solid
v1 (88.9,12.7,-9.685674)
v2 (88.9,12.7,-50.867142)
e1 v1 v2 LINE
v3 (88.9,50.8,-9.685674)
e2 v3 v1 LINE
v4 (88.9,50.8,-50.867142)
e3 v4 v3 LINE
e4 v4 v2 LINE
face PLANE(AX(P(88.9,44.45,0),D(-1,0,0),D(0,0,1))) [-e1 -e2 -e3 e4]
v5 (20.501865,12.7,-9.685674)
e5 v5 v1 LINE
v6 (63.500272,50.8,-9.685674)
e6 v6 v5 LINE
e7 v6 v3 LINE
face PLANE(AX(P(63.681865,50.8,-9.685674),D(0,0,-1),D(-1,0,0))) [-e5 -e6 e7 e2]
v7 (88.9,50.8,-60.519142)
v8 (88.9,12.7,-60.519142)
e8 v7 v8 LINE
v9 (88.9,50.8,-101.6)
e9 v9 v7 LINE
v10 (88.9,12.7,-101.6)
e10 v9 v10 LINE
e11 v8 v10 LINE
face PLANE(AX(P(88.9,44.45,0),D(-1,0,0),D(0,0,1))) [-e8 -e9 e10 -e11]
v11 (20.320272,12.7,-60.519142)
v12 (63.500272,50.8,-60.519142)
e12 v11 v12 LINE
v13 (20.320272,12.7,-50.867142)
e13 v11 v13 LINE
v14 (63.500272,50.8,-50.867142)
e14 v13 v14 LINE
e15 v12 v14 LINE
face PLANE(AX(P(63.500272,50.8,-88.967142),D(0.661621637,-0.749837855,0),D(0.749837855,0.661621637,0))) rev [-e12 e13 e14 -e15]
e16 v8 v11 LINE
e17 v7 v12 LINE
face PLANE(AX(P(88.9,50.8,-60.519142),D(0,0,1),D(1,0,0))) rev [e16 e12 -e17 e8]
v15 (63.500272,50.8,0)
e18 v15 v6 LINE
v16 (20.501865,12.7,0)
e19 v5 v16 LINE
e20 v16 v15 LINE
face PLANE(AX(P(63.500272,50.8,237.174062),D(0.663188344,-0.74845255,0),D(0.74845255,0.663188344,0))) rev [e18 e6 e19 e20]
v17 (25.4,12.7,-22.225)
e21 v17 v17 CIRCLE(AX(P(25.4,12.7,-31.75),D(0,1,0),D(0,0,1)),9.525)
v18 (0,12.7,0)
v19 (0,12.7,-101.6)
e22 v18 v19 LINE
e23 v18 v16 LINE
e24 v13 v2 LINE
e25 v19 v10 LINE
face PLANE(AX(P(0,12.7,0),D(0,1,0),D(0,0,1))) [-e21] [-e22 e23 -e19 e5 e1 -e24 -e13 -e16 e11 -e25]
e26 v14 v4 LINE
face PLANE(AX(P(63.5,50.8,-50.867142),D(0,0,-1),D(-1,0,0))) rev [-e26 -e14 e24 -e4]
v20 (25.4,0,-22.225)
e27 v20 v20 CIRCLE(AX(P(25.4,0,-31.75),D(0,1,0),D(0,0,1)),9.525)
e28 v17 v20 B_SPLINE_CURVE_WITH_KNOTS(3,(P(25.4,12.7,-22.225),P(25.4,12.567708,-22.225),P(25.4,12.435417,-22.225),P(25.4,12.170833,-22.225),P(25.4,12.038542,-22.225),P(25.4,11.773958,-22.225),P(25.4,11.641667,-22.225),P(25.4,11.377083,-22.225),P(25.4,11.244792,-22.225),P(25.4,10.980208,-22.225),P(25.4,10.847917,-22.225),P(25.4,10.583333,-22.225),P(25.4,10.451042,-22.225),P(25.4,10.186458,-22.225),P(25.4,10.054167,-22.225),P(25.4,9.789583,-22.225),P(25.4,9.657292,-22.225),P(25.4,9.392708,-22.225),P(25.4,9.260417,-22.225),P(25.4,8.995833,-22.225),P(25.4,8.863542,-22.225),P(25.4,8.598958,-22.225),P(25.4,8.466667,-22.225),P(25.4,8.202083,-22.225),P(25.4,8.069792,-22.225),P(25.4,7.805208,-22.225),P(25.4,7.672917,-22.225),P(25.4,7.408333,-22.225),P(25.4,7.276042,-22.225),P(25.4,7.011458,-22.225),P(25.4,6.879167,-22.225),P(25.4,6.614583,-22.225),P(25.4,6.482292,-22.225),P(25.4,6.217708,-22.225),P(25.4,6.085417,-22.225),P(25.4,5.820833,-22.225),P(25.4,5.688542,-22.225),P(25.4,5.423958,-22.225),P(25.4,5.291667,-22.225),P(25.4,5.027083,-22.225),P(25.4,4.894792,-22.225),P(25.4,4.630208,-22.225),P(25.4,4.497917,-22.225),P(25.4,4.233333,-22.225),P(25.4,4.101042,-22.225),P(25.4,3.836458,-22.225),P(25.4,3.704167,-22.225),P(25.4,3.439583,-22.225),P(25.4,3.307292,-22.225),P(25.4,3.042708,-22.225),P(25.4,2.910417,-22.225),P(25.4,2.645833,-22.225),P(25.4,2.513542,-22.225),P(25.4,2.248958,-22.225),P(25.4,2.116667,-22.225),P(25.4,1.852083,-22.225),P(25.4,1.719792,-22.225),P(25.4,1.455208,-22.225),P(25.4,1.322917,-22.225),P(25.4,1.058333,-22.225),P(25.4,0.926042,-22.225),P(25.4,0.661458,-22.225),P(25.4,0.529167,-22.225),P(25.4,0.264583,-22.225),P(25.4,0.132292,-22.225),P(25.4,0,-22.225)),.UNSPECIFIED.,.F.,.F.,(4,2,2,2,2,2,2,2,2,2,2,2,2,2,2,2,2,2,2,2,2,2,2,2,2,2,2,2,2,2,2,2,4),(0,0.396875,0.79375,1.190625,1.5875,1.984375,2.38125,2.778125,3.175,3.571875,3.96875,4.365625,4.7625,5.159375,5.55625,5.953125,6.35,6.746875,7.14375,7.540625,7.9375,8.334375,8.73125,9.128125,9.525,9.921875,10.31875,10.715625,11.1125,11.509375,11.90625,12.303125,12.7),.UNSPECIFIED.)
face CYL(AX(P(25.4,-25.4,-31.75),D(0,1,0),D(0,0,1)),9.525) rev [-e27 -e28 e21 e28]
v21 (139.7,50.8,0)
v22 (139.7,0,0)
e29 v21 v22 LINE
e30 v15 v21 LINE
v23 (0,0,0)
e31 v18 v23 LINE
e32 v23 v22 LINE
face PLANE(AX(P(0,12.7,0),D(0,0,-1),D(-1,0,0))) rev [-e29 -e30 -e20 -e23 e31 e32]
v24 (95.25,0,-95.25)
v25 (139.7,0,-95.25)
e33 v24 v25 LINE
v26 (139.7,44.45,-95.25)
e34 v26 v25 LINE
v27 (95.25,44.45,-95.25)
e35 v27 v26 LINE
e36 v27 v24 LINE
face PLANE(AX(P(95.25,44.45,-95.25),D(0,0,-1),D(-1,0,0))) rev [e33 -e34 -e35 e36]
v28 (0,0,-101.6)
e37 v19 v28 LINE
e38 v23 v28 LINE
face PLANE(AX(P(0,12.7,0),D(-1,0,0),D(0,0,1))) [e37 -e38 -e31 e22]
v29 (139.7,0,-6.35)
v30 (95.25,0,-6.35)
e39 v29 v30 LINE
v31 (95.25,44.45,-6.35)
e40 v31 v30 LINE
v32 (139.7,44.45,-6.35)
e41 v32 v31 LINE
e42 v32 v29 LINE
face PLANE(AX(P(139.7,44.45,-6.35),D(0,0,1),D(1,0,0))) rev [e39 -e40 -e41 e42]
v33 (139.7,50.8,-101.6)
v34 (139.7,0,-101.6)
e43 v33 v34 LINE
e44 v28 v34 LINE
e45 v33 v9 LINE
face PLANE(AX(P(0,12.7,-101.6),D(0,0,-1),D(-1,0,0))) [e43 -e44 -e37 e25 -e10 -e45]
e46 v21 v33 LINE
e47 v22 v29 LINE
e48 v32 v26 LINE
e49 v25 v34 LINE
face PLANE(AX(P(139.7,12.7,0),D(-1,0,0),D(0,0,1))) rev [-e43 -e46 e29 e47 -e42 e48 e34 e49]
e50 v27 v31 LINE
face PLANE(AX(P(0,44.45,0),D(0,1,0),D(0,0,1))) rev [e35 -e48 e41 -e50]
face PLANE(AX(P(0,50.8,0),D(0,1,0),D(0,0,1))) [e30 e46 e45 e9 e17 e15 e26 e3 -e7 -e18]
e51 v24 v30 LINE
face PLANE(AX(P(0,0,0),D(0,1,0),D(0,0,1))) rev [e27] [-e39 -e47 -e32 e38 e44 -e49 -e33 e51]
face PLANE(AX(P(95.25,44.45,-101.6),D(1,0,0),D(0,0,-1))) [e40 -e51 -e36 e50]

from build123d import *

# Parameters (mm, degrees)
SKETCH1_W            = 139.7
SKETCH1_H            = 101.6
BOSS_EXTRUDE1_DEPTH  = 12.7
SKETCH2_W            = 44.45
SKETCH2_H            = 6.35
BOSS_EXTRUDE2_DEPTH  = 31.75
SKETCH3_W            = 44.45
SKETCH3_H            = 6.35
BOSS_EXTRUDE3_DEPTH  = 31.75
SKETCH4_W            = 6.35
SKETCH4_H            = 101.6
BOSS_EXTRUDE4_DEPTH  = 31.75
SKETCH5_W            = 50.8
SKETCH5_H            = 101.6
BOSS_EXTRUDE5_DEPTH  = 6.35
SKETCH7_W            = 44.45
SKETCH7_H            = 88.9
BOSS_EXTRUDE7_DEPTH  = 12.7
SKETCH9_W            = 44.45
SKETCH9_H            = 88.9
CUT_EXTRUDE1_DEPTH   = 12.7
SKETCH10_W           = 25.218134922
SKETCH10_H           = 9.68567434
BOSS_EXTRUDE8_DEPTH  = 38.1
SKETCH11_W           = 25.4
SKETCH11_H           = 9.652
BOSS_EXTRUDE9_DEPTH  = 38.1
SKETCH12_R           = 9.525
CUT_EXTRUDE2_DEPTH   = 38.1
SKETCH13_W           = 43.179728204
SKETCH13_H           = 9.652
BOSS_EXTRUDE10_DEPTH = 38.1
SKETCH14_W           = 43.18
SKETCH14_H           = 9.68567434
BOSS_EXTRUDE11_DEPTH = 38.1
CUT_EXTRUDE8_START   = -9.68567434
CUT_EXTRUDE8_DEPTH   = 9.68567434
CUT_EXTRUDE10_DEPTH  = 38.1


# Read off the part's stored shape, not the designer's step: Cut-Extrude8
with BuildPart() as part:
    # Sketch1 → Boss-Extrude1 (new body)
    with BuildSketch(Plane(origin=(0, 0, 0), x_dir=(1, 0, 0), z_dir=(0, 1, 0))):
        with Locations((69.85, 50.8)):
            Rectangle(SKETCH1_W, SKETCH1_H)
    extrude(amount=BOSS_EXTRUDE1_DEPTH)

    # Sketch2 → Boss-Extrude2 (add)
    with BuildSketch(Plane(origin=(0, 12.7, 0), x_dir=(1, 0, 0), z_dir=(0, 1, 0))):
        with Locations((117.475, 3.175)):
            Rectangle(SKETCH2_W, SKETCH2_H)
    extrude(amount=BOSS_EXTRUDE2_DEPTH)

    # Sketch3 → Boss-Extrude3 (add)
    with BuildSketch(Plane(origin=(0, 12.7, 0), x_dir=(1, 0, 0), z_dir=(0, 1, 0))):
        with Locations((117.475, 98.425)):
            Rectangle(SKETCH3_W, SKETCH3_H)
    extrude(amount=BOSS_EXTRUDE3_DEPTH)

    # Sketch4 → Boss-Extrude4 (add)
    with BuildSketch(Plane(origin=(0, 12.7, 0), x_dir=(1, 0, 0), z_dir=(0, 1, 0))):
        with Locations((92.075, 50.8)):
            Rectangle(SKETCH4_W, SKETCH4_H)
    extrude(amount=BOSS_EXTRUDE4_DEPTH)

    # Sketch5 → Boss-Extrude5 (add)
    with BuildSketch(Plane(origin=(0, 44.45, 0), x_dir=(1, 0, 0), z_dir=(0, 1, 0))):
        with Locations((114.3, 50.8)):
            Rectangle(SKETCH5_W, SKETCH5_H)
    extrude(amount=BOSS_EXTRUDE5_DEPTH)

    # Sketch7 → Boss-Extrude7 (add)
    with BuildSketch(Plane(origin=(0, 12.7, 0), x_dir=(1, 0, 0), z_dir=(0, 1, 0))):
        with Locations((117.475, 50.8)):
            Rectangle(SKETCH7_W, SKETCH7_H)
    extrude(amount=-BOSS_EXTRUDE7_DEPTH)

    # Sketch9 → Cut-Extrude1 (cut)
    with BuildSketch(Plane(origin=(0, 12.7, 0), x_dir=(1, 0, 0), z_dir=(0, 1, 0))):
        with Locations((117.475, 50.8)):
            Rectangle(SKETCH9_W, SKETCH9_H)
    extrude(amount=-CUT_EXTRUDE1_DEPTH, mode=Mode.SUBTRACT)

    # Sketch10 → Boss-Extrude8 (add)
    with BuildSketch(Plane(origin=(0, 12.7, 0), x_dir=(1, 0, 0), z_dir=(0, 1, 0))):
        with Locations((76.290932539, 4.84283717)):
            Rectangle(SKETCH10_W, SKETCH10_H)
    extrude(amount=BOSS_EXTRUDE8_DEPTH)

    # Sketch11 → Boss-Extrude9 (add)
    with BuildSketch(Plane(origin=(0, 12.7, 0), x_dir=(1, 0, 0), z_dir=(0, 1, 0))):
        with Locations((76.2, 55.693142425)):
            Rectangle(SKETCH11_W, SKETCH11_H)
    extrude(amount=BOSS_EXTRUDE9_DEPTH)

    # Sketch12 → Cut-Extrude2 (cut)
    with BuildSketch(Plane(origin=(0, 12.7, 0), x_dir=(1, 0, 0), z_dir=(0, 1, 0))):
        with Locations(Location((25.4, 31.75, 0), (0, 0, 270))):
            Circle(SKETCH12_R)
    extrude(amount=-CUT_EXTRUDE2_DEPTH, mode=Mode.SUBTRACT)

    # Sketch13 → Boss-Extrude10 (add)
    with BuildSketch(Plane(origin=(0, 12.7, 0), x_dir=(1, 0, 0), z_dir=(0, 1, 0))):
        with Locations((41.910135898, 55.693142425)):
            Rectangle(SKETCH13_W, SKETCH13_H)
    extrude(amount=BOSS_EXTRUDE10_DEPTH)

    # Sketch14 → Boss-Extrude11 (add)
    with BuildSketch(Plane(origin=(0, 12.7, 0), x_dir=(1, 0, 0), z_dir=(0, 1, 0))):
        with Locations((42.091865078, 4.84283717)):
            Rectangle(SKETCH14_W, SKETCH14_H)
    extrude(amount=BOSS_EXTRUDE11_DEPTH)

    # Cut-Extrude8 outline → Cut-Extrude8 (cut)
    with BuildSketch(Plane.XY.offset(CUT_EXTRUDE8_START)):
        Polygon((20.501865078, 50.8), (20.501865078, 12.7), (63.500271796, 50.8), align=None)
    extrude(amount=CUT_EXTRUDE8_DEPTH, mode=Mode.SUBTRACT)

    # Sketch16 → Cut-Extrude10 (cut)
    with BuildSketch(Plane.XY.offset(-50.867142425)):
        Polygon((20.320271796, 12.7), (20.320271796, 50.8), (63.500271796, 50.8), align=None)
    extrude(amount=-CUT_EXTRUDE10_DEPTH, mode=Mode.SUBTRACT)


solid = part.part
